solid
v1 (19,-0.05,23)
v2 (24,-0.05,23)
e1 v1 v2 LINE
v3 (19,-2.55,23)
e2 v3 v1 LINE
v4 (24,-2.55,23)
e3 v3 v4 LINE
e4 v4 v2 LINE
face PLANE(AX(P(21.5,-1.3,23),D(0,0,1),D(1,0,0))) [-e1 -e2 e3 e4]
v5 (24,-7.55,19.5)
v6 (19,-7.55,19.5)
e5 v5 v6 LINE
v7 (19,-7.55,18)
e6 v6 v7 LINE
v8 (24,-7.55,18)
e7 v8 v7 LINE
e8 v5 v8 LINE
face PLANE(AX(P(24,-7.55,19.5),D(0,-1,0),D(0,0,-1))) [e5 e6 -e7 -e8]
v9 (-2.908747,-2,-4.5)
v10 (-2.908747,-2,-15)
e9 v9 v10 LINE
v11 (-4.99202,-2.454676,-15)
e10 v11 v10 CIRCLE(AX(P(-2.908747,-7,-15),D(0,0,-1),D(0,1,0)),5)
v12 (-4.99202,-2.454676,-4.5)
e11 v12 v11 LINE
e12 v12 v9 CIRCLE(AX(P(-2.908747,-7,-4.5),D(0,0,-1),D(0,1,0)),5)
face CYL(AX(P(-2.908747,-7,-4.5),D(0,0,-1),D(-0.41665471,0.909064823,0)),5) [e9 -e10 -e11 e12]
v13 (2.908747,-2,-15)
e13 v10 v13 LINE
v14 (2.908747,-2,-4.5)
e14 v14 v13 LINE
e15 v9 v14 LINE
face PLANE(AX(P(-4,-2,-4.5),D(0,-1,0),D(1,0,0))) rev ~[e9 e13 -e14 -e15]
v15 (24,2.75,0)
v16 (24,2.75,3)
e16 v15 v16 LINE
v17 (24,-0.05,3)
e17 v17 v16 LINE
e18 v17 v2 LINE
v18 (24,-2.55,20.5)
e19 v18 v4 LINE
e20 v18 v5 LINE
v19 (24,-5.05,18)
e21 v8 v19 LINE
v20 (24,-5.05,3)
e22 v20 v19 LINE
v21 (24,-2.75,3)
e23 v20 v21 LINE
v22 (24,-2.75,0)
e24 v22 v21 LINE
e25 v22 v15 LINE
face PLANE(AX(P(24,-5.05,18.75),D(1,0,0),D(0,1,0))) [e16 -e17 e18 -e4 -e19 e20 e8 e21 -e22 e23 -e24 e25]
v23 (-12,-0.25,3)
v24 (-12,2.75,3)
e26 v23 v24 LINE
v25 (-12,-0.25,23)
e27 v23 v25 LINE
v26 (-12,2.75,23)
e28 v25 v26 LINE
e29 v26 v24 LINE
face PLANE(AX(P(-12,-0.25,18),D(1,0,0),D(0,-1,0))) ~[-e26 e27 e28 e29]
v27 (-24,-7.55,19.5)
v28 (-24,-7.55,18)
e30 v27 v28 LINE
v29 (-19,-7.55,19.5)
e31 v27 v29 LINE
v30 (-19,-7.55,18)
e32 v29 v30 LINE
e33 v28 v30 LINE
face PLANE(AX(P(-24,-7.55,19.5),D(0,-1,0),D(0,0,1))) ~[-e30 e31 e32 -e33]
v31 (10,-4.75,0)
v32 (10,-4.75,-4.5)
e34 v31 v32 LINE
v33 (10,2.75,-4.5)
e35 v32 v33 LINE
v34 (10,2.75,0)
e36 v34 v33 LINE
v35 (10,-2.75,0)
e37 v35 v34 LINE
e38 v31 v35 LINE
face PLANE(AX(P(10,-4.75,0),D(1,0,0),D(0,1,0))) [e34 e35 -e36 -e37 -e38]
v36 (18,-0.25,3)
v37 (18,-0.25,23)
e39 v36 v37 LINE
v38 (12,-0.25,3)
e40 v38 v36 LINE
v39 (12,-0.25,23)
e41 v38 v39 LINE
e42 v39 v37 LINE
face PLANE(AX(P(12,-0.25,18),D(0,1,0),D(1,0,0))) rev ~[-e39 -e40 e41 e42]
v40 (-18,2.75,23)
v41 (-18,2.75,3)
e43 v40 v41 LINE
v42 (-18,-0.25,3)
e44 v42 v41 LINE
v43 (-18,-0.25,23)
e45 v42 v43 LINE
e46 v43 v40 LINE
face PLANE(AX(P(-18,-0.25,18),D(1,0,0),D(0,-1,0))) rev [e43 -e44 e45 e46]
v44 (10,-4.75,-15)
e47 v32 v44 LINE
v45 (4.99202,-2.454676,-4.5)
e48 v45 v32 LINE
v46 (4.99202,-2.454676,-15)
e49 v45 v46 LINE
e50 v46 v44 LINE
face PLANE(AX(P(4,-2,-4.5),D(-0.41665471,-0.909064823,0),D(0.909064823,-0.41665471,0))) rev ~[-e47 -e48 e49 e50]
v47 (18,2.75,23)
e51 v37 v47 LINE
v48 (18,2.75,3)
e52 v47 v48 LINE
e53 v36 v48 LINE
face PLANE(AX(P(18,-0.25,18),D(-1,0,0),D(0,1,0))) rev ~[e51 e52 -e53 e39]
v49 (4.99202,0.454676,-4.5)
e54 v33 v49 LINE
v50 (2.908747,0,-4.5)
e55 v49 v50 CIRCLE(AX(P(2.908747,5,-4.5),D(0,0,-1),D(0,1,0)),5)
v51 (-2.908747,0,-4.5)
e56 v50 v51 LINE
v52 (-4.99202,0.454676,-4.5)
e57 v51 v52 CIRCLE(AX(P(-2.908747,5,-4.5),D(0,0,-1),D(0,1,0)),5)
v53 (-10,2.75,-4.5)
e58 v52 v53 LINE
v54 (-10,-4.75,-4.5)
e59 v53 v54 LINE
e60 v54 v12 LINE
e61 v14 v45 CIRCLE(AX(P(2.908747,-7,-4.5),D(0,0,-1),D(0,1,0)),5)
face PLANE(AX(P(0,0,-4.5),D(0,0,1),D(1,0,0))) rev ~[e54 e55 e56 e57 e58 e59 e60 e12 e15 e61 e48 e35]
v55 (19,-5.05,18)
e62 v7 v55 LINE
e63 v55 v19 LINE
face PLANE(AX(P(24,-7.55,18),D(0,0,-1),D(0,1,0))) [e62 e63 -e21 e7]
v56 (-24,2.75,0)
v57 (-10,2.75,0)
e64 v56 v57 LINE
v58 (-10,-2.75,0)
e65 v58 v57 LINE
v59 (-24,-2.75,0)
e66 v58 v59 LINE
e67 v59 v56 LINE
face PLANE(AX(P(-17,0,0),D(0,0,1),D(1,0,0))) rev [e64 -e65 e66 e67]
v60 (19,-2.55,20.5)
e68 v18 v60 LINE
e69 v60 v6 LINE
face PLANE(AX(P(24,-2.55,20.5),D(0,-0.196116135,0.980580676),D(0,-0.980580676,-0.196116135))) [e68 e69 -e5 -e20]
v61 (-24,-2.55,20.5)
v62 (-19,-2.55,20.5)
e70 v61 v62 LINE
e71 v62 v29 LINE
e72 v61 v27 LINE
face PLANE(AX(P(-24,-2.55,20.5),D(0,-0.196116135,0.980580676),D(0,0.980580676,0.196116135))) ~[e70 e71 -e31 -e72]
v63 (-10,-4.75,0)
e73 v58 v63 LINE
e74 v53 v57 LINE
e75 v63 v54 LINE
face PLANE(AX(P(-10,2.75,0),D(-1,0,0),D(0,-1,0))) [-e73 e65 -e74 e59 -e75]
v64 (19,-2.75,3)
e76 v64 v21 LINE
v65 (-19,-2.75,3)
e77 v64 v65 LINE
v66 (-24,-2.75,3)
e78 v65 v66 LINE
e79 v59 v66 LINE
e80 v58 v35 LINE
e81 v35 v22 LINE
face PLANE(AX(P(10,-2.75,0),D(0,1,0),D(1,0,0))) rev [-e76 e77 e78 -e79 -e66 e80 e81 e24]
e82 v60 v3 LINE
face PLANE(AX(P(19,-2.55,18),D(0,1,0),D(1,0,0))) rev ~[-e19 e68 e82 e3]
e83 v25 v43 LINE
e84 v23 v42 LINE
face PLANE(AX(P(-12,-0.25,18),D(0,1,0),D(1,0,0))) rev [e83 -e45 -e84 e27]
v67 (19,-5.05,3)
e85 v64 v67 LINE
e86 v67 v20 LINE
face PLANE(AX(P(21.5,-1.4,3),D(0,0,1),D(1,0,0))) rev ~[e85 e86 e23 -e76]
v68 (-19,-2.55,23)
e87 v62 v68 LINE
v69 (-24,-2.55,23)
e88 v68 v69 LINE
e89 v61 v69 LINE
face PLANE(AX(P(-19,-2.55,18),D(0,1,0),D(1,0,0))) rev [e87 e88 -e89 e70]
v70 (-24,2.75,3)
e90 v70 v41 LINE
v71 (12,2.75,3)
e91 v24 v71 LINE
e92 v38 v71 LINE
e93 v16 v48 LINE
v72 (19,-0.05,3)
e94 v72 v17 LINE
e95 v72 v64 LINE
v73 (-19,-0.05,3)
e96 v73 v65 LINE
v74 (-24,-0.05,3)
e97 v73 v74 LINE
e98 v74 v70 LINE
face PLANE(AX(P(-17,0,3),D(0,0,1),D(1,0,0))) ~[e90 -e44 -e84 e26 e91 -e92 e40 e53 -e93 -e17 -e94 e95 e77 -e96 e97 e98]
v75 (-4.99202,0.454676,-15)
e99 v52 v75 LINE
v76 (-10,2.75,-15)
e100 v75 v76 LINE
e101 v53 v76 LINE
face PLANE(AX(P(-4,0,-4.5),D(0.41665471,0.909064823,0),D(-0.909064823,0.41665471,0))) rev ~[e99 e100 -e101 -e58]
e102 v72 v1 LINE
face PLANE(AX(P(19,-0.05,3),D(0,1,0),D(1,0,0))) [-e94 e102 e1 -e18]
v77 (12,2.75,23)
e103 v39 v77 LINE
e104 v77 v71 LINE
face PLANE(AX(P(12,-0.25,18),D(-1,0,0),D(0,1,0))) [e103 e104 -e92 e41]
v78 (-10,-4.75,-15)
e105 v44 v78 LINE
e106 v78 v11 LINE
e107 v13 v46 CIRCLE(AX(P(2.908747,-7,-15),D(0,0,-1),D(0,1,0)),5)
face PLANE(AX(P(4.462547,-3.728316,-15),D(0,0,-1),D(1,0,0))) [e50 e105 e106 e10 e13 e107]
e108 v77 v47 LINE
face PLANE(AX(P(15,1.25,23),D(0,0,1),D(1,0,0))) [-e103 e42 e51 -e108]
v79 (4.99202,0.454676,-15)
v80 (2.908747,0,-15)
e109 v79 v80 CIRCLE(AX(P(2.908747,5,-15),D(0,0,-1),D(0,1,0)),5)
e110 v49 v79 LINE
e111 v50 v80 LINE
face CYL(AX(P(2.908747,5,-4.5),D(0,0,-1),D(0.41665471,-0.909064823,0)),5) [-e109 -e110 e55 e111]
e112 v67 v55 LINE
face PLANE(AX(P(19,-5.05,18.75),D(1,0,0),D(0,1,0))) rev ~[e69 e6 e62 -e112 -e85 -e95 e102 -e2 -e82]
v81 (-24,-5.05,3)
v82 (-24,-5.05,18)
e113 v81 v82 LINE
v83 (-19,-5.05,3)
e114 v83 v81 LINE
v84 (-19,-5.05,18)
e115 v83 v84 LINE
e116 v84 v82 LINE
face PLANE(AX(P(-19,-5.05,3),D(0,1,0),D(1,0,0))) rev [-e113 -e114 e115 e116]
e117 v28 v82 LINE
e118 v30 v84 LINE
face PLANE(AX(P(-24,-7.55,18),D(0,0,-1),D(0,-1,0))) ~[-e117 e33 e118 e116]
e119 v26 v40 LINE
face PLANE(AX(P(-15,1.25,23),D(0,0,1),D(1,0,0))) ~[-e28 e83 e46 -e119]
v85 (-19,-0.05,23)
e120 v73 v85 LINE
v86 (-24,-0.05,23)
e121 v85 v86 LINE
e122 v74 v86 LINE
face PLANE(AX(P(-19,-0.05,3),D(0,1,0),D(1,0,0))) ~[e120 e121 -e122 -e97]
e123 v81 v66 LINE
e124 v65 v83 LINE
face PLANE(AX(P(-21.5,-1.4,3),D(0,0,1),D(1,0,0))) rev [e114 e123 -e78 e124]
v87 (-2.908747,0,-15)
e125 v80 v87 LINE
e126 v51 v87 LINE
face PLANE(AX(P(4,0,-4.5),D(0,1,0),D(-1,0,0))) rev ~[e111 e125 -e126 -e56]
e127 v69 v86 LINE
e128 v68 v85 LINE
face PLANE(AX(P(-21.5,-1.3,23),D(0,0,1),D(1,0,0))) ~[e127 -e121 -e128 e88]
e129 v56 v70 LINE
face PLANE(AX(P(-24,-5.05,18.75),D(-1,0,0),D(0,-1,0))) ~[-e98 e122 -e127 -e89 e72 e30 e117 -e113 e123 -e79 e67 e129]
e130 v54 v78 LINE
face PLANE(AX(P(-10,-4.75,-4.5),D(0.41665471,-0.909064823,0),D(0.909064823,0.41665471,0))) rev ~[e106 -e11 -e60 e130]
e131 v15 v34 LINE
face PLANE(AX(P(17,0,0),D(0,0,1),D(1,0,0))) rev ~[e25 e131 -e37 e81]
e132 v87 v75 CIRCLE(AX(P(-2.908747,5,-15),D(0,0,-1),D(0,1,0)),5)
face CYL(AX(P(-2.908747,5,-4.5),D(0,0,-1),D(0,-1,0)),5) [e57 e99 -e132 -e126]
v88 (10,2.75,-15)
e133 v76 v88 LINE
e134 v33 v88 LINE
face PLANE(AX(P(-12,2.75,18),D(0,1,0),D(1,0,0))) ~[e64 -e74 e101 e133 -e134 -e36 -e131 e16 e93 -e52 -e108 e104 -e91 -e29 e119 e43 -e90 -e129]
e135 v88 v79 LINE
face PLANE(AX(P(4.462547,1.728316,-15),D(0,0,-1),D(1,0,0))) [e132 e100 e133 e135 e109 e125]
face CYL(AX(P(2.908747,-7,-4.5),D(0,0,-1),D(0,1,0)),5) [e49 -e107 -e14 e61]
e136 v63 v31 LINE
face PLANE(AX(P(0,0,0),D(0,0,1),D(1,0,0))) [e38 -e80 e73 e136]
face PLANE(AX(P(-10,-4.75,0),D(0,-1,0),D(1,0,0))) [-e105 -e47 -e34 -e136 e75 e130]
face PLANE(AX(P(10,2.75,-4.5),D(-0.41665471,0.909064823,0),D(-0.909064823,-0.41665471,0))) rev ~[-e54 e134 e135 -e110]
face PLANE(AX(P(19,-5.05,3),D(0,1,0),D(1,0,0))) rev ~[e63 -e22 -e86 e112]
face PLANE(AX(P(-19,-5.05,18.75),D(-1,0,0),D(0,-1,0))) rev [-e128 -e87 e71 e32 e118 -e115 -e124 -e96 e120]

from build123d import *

# Parameters (mm, degrees)
F0_W      = 14
F0_H      = 5.5
F1_DEPTH  = 3
F0_W_2    = 10
F0_H_2    = 2
F2_DEPTH  = 4.5
F4_DEPTH  = 10.5
F5_W      = 6
F5_H      = 3
F5_W_2    = 5
F5_H_2    = 2.7
F5_H_3    = 2.3
F6_DEPTH  = 15
F6_FACE_W = 6
F6_FACE_H = 3
F7_W      = 5
F7_H      = 2.5
F8_DEPTH  = 5
F10_DEPTH = 5
F12_R     = 5


# Not quite as in the source:
# - a feature names something its author has since deleted; it is built from what else it names


with BuildPart() as f1:
    # F0 (on Top) → F1 (new body)
    with BuildSketch(Plane.XY):
        with Locations((17, 0)):
            Rectangle(F0_W, F0_H)
        Polygon((0, -2.75), (10, -2.75), (10, 2.75), (-10, 2.75), (-10, -2.75), align=None)
    extrude(amount=F1_DEPTH)

    # F0 (on Top) → F2 (join)
    with BuildSketch(Plane.XY):
        Polygon((0, -2.75), (10, -2.75), (10, 2.75), (-10, 2.75), (-10, -2.75), align=None)
        with Locations((-5, -3.75)):
            Rectangle(F0_W_2, F0_H_2)
        with Locations((5, -3.75)):
            Rectangle(F0_W_2, F0_H_2)
    extrude(amount=-F2_DEPTH)

    # F3 (on face) → F4 (join)
    with BuildSketch(Plane(origin=(0, 0, -4.5), x_dir=(1, 0, 0), z_dir=(0, 0, -1))):
        Polygon((0, -2.75), (10, -2.75), (4, 0), (0, 0), align=None)
        Polygon((-10, -2.75), (0, -2.75), (0, 0), (-4, 0), align=None)
        Polygon((4, 2), (10, 4.75), (0, 4.75), (0, 2), align=None)
        Polygon((-4, 2), (0, 2), (0, 4.75), (-10, 4.75), align=None)
    extrude(amount=F4_DEPTH)

    # F5 (on face) → F6 (join)
    with BuildSketch(Plane.XY.offset(3)):
        with Locations((15, 1.25)):
            Rectangle(F5_W, F5_H)
        with Locations((21.5, -1.4)):
            Rectangle(F5_W_2, F5_H_2)
        with Locations((21.5, -3.9)):
            Rectangle(F5_W_2, F5_H_3)
    extrude(amount=F6_DEPTH)

    # F6_face (on face) + F7 (on face) → F8 (join)
    with BuildSketch(Plane(origin=(21.5, -2.55, 18), x_dir=(1, 0, 0), z_dir=(0, 0, 1))):
        with Locations((-6.5, 3.8)):
            Rectangle(F6_FACE_W, F6_FACE_H)
    with BuildSketch(Plane.XY.offset(18)):
        with Locations((21.5, -1.3)):
            Rectangle(F7_W, F7_H)
    extrude(amount=F8_DEPTH)

    # F9 (on face) → F10 (join)
    with BuildSketch(Plane.YZ.offset(24)):
        Polygon((-5.05, 18), (-2.55, 18), (-2.55, 19.5), (-7.55, 19.5), (-7.55, 18), align=None)
        Polygon((-7.55, 19.5), (-2.55, 19.5), (-2.55, 20.5), align=None)
    extrude(amount=-F10_DEPTH)

    # F11: F1 across plane


with BuildPart() as f1_1:
    add(f1.part)
    add(f1.part.mirror(Plane.YZ))

    # F12
    f12_edges = [f1_1.edges().sort_by_distance(p)[0] for p in [
        (-4, -2, -9.75),
        (4, -2, -9.75),
        (4, 0, -9.75),
        (-4, 0, -9.75),
    ]]
    fillet(f12_edges, radius=F12_R)


solid = f1_1.part
